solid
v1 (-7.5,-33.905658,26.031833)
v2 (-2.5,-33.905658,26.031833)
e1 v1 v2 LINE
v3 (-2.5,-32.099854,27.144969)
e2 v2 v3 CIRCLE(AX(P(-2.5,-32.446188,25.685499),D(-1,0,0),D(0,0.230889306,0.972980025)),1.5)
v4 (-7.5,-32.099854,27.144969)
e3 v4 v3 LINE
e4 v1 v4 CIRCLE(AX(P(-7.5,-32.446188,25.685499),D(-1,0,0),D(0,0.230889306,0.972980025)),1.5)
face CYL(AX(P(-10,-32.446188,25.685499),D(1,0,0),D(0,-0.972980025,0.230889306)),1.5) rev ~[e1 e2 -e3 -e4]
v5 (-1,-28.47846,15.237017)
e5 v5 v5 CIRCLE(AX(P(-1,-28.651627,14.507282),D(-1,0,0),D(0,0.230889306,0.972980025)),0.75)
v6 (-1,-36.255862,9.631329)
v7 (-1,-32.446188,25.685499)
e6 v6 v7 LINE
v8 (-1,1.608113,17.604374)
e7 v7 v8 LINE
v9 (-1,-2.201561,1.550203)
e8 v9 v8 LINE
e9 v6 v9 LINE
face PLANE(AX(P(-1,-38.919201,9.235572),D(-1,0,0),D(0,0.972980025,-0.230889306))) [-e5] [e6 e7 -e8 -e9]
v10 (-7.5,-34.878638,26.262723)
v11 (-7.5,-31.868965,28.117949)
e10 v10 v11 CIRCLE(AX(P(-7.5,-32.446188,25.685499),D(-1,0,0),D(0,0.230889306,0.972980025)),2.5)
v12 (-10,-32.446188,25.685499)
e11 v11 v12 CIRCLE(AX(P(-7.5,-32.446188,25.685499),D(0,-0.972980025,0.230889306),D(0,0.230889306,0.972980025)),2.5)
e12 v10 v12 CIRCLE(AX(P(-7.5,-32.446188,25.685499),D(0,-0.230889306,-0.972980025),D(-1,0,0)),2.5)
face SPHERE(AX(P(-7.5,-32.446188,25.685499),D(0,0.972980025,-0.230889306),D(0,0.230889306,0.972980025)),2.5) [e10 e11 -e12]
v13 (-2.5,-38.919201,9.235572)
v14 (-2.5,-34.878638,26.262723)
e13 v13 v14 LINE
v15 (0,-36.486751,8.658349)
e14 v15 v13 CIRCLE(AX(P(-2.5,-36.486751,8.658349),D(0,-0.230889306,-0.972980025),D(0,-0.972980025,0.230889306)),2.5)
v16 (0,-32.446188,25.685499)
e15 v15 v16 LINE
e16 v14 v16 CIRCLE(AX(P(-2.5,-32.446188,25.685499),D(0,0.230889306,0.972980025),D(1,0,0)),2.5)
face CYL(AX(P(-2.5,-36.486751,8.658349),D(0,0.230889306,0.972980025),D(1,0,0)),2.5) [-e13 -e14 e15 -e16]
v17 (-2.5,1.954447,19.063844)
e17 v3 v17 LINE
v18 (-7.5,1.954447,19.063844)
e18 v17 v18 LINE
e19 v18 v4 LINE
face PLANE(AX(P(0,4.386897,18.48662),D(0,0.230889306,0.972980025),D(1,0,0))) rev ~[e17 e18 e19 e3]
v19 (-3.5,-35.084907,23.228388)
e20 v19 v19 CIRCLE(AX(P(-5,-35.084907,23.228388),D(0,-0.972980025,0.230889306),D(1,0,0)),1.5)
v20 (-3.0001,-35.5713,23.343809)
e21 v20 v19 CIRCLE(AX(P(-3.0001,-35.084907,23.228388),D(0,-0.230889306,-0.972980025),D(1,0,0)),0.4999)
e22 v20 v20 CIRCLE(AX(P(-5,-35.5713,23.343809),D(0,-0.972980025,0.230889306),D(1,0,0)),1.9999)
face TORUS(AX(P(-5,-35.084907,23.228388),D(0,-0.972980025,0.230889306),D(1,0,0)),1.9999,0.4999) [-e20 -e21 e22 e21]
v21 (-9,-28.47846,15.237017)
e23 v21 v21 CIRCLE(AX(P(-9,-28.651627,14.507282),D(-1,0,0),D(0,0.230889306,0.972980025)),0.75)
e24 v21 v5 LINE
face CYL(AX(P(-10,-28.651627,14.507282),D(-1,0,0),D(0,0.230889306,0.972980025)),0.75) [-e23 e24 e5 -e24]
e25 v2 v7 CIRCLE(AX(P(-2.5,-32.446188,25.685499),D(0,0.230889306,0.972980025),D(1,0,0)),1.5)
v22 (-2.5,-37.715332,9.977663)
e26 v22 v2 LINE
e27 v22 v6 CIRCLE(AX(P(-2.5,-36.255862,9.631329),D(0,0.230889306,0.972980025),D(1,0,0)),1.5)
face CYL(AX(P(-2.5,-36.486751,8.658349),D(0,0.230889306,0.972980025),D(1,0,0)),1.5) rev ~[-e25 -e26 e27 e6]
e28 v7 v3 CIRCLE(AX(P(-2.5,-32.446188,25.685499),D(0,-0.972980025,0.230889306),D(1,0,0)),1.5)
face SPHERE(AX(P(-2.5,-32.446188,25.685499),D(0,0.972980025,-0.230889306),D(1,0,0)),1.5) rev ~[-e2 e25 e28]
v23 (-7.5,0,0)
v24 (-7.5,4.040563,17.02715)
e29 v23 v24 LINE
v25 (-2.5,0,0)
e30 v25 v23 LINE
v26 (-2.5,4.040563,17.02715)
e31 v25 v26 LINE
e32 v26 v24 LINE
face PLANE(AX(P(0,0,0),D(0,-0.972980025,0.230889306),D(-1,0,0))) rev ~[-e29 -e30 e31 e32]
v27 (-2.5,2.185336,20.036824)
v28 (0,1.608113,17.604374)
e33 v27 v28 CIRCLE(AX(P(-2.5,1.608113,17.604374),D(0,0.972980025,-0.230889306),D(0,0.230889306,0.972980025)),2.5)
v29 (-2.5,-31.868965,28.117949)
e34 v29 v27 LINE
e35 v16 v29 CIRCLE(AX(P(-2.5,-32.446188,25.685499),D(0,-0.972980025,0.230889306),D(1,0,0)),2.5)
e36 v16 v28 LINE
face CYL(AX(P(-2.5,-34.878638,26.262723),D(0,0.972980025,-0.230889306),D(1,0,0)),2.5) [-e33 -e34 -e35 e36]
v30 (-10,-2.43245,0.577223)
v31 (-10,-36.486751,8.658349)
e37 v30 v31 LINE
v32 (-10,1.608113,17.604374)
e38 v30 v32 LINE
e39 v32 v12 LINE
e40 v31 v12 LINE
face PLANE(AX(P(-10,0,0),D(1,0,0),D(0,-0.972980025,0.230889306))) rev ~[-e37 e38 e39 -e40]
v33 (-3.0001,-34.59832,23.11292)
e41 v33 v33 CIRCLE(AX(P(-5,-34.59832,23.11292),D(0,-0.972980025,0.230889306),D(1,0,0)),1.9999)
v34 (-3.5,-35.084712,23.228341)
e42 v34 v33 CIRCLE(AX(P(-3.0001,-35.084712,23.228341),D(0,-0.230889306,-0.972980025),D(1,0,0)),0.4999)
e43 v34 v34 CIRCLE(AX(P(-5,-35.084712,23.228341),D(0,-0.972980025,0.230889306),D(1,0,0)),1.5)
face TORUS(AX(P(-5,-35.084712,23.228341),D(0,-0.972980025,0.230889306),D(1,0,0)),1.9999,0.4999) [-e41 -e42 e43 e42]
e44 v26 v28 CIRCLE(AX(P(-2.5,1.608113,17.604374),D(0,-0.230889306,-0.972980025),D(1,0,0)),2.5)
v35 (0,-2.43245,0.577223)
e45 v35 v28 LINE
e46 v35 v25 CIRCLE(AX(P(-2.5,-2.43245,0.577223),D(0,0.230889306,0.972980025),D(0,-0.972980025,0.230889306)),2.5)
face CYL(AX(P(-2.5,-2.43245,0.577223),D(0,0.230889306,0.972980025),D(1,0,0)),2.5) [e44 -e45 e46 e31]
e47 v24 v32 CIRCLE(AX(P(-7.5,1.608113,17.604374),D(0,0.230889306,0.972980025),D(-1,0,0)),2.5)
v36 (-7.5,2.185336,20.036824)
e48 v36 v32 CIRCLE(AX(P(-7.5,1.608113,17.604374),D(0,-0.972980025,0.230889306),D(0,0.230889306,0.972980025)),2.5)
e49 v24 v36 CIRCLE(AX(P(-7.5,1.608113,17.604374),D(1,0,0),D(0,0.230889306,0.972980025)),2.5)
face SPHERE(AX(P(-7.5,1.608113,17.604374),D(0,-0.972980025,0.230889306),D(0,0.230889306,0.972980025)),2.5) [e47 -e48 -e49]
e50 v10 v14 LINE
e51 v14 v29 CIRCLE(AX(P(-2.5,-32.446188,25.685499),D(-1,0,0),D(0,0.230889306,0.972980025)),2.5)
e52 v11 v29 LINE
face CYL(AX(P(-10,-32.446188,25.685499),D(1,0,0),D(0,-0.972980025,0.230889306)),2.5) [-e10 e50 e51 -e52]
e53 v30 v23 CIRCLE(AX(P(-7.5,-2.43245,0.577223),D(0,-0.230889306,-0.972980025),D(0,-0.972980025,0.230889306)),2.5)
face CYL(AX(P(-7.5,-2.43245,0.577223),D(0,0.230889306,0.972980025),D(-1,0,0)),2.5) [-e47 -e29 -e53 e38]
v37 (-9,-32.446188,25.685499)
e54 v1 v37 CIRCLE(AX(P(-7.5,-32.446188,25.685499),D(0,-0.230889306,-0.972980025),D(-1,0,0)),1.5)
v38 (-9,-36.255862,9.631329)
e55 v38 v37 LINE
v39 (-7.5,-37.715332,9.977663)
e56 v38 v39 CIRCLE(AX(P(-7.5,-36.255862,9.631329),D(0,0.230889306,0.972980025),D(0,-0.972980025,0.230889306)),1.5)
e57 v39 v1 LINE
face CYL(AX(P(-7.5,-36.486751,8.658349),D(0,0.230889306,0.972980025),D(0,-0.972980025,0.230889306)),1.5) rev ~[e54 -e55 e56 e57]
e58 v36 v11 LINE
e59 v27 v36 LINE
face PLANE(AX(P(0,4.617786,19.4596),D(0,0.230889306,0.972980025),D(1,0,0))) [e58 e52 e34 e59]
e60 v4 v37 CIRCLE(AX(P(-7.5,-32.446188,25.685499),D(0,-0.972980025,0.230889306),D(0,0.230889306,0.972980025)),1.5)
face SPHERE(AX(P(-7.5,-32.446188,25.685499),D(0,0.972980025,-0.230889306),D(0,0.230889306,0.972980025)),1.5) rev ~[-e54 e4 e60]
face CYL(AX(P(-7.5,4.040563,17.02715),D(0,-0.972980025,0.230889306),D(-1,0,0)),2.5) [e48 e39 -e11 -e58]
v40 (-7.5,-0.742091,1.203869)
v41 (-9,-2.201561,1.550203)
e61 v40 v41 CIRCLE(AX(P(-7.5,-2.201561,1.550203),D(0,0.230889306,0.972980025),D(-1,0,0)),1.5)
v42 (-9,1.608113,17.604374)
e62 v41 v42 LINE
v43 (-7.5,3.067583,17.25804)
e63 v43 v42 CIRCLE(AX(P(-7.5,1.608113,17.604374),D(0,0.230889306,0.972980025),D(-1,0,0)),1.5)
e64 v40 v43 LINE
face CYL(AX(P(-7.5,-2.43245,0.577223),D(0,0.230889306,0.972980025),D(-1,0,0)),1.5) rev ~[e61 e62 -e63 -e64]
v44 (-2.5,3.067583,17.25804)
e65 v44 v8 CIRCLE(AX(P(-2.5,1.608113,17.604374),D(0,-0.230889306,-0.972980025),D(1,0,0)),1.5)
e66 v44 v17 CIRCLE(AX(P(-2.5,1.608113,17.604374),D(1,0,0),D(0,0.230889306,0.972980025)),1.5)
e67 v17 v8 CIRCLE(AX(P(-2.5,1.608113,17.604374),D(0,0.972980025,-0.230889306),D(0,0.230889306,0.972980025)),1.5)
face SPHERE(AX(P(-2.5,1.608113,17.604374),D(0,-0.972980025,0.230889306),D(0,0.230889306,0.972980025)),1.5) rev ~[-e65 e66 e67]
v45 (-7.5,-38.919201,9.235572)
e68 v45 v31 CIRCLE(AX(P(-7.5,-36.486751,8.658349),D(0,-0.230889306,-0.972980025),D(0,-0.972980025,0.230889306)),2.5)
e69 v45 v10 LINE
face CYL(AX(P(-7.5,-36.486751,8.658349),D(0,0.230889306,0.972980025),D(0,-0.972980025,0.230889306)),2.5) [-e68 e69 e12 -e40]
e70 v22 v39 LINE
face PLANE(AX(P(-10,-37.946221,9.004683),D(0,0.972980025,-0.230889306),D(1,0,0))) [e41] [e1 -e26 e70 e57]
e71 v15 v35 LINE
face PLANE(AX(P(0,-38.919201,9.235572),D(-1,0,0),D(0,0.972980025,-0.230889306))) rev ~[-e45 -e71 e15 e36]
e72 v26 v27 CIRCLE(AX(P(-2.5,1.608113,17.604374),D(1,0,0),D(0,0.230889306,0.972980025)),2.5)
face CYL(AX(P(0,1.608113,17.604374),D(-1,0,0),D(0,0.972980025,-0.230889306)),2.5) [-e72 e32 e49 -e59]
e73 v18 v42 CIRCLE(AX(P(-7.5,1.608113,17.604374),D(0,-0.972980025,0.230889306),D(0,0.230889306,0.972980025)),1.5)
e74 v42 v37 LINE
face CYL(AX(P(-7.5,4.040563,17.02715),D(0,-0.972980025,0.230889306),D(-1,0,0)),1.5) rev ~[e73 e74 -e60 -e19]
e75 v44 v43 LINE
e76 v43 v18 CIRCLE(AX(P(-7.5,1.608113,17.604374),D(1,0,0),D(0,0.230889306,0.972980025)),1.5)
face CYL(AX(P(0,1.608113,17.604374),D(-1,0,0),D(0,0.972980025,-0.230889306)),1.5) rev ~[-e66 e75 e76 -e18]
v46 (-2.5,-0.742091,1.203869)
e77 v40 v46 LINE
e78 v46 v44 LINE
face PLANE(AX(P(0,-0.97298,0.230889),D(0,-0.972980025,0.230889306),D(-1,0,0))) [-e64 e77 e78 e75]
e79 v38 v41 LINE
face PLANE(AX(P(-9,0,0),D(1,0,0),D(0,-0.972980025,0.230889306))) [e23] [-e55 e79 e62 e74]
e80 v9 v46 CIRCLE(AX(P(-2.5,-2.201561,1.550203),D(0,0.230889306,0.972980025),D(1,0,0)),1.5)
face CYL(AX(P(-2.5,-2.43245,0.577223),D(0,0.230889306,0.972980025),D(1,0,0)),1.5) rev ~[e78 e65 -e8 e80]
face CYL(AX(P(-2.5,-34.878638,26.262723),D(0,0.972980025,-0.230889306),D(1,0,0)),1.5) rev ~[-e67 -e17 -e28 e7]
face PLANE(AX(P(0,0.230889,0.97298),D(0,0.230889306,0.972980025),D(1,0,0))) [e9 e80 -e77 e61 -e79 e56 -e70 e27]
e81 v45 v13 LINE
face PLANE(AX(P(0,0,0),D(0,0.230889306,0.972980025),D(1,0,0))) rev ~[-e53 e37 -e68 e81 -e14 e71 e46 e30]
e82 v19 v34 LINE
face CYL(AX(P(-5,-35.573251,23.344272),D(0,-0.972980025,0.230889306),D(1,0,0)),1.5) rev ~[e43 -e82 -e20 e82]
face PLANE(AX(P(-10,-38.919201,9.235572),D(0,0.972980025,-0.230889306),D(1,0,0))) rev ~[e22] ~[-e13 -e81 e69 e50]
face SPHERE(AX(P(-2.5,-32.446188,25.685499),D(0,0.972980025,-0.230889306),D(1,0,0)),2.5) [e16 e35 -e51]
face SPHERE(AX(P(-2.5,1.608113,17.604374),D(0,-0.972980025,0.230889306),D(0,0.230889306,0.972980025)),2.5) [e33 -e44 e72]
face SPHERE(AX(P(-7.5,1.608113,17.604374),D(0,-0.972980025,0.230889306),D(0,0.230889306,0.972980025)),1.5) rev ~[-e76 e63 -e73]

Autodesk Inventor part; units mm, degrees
ref_plane "YZ Plane" through (0, 0, 0) normal (1, 0, 0) x (0, 1, 0)
ref_plane "XZ Plane" through (0, 0, 0) normal (0, 1, 0) x (-1, 0, 0)
sketch "Sketch1" plane through (0, 0, 0) normal (1, 0, 0) x (0, 1, 0)
  line L0 (0, 0) -> (67.821, 0)
  line L1 (67.821, 0) -> (67.821, -16.094)
  line L2 (67.821, -16.094) -> (0, -16.094)
  line L3 (0, -16.094) -> (0, 0)
  line L4 (67.821, -16.094) -> (0, 0)
  dimension "d0" = 67.821
  dimension "d1" = 16.094
ref_plane "Work Plane1" through (0, 0, 0) normal (0, 0.2308893, 0.97298) x (1, 0, 0)
sketch "Sketch4" plane through (0, 0, 0) normal (0, 0.2308893, 0.97298) x (1, 0, 0)
  line L0 (0, 0) -> (-10, 0)
  line L1 (-10, 0) -> (-10, -40)
  line L2 (-10, -40) -> (0, -40)
  line L3 (0, -40) -> (0, 0)
  dimension "d16" = 40
  dimension "d17" = 10
extrude "Extrusion4" add sketch "Sketch4" along normal blind 20
fillet "Fillet3" radius 2.5 8 edges at (0, -14.8418, 24.0774) (-10, -14.8418, 24.0774) (-5, 4.6178, 19.4596) (-10, 2.3089, 9.7298) (0, 2.3089, 9.7298) (0, -36.6103, 18.9654) (-5, -34.3014, 28.6952) (-10, -36.6103, 18.9654)
shell "Shell2" thickness 1 removed faces 0
sketch "Sketch5" plane through (-7.5, -38.9192, 9.2356) normal (0, -0.97298, 0.2308893) x (1, 0, 0)
  line L0 (0, 0) -> (0, 17.5) projected
  line L1 (0, 0) -> (5, 0) projected
  line L2 (5, 17.5) -> (5, 0) projected
  line L3 (0, 17.5) -> (5, 17.5) projected
  circle A0 centre (2.5, 14.5) radius 1.5
  point P0 (7.5, 0)
  point P1 (2.5, 17.5)
  dimension "d22" = 3
  dimension "d23" = 3
extrude "Extrusion5" cut sketch "Sketch5" against normal blind 2 contours A0
fillet "Fillet4" radius 0.5 2 edges at (-6.5, -34.5983, 23.1129) (-6.5, -35.5713, 23.3438)
sketch "Sketch6" plane through (0, -36.4868, 8.6583) normal (1, 0, 0) x (0, -0.2308893, -0.97298)
  line L0 (-17.5, 35) -> (0, 35) projected
  line L1 (-17.5, 0) -> (-17.5, 35) projected
  line L2 (0, 0) -> (-17.5, 0) projected
  line L3 (0, 0) -> (0, 35) projected
  point P0 (0, 37.5)
  dimension "d27" = 35
  dimension "d28" = 17.5
sketch "Sketch7" plane through (-10, -36.4868, 8.6583) normal (-1, 0, 0) x (0, 0.2308893, 0.97298)
  line L0 (0, -2.5) -> (17.5, -2.5) projected
  line L1 (20, 0) -> (20, 35) projected
  line L2 (20, -2.5) -> (6.9383, -2.5)
  line L3 (7.5, 6.273) -> (20, 6.273)
  line L4 (20, 6.273) -> (20, -2.5)
  line L5 (0, -2.5) -> (20, -2.5)
  line L6 (12.5, -2.5) -> (16.5, -2.5) projected
  line L7 (20, 6.273) -> (20, -2.5)
  line L8 (20, -2.5) -> (20, 16.6364)
  line L9 (20, 35) -> (20, 0) projected
  line L10 (7.5, 6.273) -> (7.5, -2.5)
  circle A0 centre (7.5, 6.273) radius 0.75
  point P0 (0, 37.5)
  dimension "d29" = 12.5
  dimension "d30" = 8.773
  dimension "d31" = 1.5
extrude "Extrusion6" add sketch "Sketch7" against normal blind 10 contours A0 L3 L10 | L10 L3 A0
properties part number "caja de los actuadores"
